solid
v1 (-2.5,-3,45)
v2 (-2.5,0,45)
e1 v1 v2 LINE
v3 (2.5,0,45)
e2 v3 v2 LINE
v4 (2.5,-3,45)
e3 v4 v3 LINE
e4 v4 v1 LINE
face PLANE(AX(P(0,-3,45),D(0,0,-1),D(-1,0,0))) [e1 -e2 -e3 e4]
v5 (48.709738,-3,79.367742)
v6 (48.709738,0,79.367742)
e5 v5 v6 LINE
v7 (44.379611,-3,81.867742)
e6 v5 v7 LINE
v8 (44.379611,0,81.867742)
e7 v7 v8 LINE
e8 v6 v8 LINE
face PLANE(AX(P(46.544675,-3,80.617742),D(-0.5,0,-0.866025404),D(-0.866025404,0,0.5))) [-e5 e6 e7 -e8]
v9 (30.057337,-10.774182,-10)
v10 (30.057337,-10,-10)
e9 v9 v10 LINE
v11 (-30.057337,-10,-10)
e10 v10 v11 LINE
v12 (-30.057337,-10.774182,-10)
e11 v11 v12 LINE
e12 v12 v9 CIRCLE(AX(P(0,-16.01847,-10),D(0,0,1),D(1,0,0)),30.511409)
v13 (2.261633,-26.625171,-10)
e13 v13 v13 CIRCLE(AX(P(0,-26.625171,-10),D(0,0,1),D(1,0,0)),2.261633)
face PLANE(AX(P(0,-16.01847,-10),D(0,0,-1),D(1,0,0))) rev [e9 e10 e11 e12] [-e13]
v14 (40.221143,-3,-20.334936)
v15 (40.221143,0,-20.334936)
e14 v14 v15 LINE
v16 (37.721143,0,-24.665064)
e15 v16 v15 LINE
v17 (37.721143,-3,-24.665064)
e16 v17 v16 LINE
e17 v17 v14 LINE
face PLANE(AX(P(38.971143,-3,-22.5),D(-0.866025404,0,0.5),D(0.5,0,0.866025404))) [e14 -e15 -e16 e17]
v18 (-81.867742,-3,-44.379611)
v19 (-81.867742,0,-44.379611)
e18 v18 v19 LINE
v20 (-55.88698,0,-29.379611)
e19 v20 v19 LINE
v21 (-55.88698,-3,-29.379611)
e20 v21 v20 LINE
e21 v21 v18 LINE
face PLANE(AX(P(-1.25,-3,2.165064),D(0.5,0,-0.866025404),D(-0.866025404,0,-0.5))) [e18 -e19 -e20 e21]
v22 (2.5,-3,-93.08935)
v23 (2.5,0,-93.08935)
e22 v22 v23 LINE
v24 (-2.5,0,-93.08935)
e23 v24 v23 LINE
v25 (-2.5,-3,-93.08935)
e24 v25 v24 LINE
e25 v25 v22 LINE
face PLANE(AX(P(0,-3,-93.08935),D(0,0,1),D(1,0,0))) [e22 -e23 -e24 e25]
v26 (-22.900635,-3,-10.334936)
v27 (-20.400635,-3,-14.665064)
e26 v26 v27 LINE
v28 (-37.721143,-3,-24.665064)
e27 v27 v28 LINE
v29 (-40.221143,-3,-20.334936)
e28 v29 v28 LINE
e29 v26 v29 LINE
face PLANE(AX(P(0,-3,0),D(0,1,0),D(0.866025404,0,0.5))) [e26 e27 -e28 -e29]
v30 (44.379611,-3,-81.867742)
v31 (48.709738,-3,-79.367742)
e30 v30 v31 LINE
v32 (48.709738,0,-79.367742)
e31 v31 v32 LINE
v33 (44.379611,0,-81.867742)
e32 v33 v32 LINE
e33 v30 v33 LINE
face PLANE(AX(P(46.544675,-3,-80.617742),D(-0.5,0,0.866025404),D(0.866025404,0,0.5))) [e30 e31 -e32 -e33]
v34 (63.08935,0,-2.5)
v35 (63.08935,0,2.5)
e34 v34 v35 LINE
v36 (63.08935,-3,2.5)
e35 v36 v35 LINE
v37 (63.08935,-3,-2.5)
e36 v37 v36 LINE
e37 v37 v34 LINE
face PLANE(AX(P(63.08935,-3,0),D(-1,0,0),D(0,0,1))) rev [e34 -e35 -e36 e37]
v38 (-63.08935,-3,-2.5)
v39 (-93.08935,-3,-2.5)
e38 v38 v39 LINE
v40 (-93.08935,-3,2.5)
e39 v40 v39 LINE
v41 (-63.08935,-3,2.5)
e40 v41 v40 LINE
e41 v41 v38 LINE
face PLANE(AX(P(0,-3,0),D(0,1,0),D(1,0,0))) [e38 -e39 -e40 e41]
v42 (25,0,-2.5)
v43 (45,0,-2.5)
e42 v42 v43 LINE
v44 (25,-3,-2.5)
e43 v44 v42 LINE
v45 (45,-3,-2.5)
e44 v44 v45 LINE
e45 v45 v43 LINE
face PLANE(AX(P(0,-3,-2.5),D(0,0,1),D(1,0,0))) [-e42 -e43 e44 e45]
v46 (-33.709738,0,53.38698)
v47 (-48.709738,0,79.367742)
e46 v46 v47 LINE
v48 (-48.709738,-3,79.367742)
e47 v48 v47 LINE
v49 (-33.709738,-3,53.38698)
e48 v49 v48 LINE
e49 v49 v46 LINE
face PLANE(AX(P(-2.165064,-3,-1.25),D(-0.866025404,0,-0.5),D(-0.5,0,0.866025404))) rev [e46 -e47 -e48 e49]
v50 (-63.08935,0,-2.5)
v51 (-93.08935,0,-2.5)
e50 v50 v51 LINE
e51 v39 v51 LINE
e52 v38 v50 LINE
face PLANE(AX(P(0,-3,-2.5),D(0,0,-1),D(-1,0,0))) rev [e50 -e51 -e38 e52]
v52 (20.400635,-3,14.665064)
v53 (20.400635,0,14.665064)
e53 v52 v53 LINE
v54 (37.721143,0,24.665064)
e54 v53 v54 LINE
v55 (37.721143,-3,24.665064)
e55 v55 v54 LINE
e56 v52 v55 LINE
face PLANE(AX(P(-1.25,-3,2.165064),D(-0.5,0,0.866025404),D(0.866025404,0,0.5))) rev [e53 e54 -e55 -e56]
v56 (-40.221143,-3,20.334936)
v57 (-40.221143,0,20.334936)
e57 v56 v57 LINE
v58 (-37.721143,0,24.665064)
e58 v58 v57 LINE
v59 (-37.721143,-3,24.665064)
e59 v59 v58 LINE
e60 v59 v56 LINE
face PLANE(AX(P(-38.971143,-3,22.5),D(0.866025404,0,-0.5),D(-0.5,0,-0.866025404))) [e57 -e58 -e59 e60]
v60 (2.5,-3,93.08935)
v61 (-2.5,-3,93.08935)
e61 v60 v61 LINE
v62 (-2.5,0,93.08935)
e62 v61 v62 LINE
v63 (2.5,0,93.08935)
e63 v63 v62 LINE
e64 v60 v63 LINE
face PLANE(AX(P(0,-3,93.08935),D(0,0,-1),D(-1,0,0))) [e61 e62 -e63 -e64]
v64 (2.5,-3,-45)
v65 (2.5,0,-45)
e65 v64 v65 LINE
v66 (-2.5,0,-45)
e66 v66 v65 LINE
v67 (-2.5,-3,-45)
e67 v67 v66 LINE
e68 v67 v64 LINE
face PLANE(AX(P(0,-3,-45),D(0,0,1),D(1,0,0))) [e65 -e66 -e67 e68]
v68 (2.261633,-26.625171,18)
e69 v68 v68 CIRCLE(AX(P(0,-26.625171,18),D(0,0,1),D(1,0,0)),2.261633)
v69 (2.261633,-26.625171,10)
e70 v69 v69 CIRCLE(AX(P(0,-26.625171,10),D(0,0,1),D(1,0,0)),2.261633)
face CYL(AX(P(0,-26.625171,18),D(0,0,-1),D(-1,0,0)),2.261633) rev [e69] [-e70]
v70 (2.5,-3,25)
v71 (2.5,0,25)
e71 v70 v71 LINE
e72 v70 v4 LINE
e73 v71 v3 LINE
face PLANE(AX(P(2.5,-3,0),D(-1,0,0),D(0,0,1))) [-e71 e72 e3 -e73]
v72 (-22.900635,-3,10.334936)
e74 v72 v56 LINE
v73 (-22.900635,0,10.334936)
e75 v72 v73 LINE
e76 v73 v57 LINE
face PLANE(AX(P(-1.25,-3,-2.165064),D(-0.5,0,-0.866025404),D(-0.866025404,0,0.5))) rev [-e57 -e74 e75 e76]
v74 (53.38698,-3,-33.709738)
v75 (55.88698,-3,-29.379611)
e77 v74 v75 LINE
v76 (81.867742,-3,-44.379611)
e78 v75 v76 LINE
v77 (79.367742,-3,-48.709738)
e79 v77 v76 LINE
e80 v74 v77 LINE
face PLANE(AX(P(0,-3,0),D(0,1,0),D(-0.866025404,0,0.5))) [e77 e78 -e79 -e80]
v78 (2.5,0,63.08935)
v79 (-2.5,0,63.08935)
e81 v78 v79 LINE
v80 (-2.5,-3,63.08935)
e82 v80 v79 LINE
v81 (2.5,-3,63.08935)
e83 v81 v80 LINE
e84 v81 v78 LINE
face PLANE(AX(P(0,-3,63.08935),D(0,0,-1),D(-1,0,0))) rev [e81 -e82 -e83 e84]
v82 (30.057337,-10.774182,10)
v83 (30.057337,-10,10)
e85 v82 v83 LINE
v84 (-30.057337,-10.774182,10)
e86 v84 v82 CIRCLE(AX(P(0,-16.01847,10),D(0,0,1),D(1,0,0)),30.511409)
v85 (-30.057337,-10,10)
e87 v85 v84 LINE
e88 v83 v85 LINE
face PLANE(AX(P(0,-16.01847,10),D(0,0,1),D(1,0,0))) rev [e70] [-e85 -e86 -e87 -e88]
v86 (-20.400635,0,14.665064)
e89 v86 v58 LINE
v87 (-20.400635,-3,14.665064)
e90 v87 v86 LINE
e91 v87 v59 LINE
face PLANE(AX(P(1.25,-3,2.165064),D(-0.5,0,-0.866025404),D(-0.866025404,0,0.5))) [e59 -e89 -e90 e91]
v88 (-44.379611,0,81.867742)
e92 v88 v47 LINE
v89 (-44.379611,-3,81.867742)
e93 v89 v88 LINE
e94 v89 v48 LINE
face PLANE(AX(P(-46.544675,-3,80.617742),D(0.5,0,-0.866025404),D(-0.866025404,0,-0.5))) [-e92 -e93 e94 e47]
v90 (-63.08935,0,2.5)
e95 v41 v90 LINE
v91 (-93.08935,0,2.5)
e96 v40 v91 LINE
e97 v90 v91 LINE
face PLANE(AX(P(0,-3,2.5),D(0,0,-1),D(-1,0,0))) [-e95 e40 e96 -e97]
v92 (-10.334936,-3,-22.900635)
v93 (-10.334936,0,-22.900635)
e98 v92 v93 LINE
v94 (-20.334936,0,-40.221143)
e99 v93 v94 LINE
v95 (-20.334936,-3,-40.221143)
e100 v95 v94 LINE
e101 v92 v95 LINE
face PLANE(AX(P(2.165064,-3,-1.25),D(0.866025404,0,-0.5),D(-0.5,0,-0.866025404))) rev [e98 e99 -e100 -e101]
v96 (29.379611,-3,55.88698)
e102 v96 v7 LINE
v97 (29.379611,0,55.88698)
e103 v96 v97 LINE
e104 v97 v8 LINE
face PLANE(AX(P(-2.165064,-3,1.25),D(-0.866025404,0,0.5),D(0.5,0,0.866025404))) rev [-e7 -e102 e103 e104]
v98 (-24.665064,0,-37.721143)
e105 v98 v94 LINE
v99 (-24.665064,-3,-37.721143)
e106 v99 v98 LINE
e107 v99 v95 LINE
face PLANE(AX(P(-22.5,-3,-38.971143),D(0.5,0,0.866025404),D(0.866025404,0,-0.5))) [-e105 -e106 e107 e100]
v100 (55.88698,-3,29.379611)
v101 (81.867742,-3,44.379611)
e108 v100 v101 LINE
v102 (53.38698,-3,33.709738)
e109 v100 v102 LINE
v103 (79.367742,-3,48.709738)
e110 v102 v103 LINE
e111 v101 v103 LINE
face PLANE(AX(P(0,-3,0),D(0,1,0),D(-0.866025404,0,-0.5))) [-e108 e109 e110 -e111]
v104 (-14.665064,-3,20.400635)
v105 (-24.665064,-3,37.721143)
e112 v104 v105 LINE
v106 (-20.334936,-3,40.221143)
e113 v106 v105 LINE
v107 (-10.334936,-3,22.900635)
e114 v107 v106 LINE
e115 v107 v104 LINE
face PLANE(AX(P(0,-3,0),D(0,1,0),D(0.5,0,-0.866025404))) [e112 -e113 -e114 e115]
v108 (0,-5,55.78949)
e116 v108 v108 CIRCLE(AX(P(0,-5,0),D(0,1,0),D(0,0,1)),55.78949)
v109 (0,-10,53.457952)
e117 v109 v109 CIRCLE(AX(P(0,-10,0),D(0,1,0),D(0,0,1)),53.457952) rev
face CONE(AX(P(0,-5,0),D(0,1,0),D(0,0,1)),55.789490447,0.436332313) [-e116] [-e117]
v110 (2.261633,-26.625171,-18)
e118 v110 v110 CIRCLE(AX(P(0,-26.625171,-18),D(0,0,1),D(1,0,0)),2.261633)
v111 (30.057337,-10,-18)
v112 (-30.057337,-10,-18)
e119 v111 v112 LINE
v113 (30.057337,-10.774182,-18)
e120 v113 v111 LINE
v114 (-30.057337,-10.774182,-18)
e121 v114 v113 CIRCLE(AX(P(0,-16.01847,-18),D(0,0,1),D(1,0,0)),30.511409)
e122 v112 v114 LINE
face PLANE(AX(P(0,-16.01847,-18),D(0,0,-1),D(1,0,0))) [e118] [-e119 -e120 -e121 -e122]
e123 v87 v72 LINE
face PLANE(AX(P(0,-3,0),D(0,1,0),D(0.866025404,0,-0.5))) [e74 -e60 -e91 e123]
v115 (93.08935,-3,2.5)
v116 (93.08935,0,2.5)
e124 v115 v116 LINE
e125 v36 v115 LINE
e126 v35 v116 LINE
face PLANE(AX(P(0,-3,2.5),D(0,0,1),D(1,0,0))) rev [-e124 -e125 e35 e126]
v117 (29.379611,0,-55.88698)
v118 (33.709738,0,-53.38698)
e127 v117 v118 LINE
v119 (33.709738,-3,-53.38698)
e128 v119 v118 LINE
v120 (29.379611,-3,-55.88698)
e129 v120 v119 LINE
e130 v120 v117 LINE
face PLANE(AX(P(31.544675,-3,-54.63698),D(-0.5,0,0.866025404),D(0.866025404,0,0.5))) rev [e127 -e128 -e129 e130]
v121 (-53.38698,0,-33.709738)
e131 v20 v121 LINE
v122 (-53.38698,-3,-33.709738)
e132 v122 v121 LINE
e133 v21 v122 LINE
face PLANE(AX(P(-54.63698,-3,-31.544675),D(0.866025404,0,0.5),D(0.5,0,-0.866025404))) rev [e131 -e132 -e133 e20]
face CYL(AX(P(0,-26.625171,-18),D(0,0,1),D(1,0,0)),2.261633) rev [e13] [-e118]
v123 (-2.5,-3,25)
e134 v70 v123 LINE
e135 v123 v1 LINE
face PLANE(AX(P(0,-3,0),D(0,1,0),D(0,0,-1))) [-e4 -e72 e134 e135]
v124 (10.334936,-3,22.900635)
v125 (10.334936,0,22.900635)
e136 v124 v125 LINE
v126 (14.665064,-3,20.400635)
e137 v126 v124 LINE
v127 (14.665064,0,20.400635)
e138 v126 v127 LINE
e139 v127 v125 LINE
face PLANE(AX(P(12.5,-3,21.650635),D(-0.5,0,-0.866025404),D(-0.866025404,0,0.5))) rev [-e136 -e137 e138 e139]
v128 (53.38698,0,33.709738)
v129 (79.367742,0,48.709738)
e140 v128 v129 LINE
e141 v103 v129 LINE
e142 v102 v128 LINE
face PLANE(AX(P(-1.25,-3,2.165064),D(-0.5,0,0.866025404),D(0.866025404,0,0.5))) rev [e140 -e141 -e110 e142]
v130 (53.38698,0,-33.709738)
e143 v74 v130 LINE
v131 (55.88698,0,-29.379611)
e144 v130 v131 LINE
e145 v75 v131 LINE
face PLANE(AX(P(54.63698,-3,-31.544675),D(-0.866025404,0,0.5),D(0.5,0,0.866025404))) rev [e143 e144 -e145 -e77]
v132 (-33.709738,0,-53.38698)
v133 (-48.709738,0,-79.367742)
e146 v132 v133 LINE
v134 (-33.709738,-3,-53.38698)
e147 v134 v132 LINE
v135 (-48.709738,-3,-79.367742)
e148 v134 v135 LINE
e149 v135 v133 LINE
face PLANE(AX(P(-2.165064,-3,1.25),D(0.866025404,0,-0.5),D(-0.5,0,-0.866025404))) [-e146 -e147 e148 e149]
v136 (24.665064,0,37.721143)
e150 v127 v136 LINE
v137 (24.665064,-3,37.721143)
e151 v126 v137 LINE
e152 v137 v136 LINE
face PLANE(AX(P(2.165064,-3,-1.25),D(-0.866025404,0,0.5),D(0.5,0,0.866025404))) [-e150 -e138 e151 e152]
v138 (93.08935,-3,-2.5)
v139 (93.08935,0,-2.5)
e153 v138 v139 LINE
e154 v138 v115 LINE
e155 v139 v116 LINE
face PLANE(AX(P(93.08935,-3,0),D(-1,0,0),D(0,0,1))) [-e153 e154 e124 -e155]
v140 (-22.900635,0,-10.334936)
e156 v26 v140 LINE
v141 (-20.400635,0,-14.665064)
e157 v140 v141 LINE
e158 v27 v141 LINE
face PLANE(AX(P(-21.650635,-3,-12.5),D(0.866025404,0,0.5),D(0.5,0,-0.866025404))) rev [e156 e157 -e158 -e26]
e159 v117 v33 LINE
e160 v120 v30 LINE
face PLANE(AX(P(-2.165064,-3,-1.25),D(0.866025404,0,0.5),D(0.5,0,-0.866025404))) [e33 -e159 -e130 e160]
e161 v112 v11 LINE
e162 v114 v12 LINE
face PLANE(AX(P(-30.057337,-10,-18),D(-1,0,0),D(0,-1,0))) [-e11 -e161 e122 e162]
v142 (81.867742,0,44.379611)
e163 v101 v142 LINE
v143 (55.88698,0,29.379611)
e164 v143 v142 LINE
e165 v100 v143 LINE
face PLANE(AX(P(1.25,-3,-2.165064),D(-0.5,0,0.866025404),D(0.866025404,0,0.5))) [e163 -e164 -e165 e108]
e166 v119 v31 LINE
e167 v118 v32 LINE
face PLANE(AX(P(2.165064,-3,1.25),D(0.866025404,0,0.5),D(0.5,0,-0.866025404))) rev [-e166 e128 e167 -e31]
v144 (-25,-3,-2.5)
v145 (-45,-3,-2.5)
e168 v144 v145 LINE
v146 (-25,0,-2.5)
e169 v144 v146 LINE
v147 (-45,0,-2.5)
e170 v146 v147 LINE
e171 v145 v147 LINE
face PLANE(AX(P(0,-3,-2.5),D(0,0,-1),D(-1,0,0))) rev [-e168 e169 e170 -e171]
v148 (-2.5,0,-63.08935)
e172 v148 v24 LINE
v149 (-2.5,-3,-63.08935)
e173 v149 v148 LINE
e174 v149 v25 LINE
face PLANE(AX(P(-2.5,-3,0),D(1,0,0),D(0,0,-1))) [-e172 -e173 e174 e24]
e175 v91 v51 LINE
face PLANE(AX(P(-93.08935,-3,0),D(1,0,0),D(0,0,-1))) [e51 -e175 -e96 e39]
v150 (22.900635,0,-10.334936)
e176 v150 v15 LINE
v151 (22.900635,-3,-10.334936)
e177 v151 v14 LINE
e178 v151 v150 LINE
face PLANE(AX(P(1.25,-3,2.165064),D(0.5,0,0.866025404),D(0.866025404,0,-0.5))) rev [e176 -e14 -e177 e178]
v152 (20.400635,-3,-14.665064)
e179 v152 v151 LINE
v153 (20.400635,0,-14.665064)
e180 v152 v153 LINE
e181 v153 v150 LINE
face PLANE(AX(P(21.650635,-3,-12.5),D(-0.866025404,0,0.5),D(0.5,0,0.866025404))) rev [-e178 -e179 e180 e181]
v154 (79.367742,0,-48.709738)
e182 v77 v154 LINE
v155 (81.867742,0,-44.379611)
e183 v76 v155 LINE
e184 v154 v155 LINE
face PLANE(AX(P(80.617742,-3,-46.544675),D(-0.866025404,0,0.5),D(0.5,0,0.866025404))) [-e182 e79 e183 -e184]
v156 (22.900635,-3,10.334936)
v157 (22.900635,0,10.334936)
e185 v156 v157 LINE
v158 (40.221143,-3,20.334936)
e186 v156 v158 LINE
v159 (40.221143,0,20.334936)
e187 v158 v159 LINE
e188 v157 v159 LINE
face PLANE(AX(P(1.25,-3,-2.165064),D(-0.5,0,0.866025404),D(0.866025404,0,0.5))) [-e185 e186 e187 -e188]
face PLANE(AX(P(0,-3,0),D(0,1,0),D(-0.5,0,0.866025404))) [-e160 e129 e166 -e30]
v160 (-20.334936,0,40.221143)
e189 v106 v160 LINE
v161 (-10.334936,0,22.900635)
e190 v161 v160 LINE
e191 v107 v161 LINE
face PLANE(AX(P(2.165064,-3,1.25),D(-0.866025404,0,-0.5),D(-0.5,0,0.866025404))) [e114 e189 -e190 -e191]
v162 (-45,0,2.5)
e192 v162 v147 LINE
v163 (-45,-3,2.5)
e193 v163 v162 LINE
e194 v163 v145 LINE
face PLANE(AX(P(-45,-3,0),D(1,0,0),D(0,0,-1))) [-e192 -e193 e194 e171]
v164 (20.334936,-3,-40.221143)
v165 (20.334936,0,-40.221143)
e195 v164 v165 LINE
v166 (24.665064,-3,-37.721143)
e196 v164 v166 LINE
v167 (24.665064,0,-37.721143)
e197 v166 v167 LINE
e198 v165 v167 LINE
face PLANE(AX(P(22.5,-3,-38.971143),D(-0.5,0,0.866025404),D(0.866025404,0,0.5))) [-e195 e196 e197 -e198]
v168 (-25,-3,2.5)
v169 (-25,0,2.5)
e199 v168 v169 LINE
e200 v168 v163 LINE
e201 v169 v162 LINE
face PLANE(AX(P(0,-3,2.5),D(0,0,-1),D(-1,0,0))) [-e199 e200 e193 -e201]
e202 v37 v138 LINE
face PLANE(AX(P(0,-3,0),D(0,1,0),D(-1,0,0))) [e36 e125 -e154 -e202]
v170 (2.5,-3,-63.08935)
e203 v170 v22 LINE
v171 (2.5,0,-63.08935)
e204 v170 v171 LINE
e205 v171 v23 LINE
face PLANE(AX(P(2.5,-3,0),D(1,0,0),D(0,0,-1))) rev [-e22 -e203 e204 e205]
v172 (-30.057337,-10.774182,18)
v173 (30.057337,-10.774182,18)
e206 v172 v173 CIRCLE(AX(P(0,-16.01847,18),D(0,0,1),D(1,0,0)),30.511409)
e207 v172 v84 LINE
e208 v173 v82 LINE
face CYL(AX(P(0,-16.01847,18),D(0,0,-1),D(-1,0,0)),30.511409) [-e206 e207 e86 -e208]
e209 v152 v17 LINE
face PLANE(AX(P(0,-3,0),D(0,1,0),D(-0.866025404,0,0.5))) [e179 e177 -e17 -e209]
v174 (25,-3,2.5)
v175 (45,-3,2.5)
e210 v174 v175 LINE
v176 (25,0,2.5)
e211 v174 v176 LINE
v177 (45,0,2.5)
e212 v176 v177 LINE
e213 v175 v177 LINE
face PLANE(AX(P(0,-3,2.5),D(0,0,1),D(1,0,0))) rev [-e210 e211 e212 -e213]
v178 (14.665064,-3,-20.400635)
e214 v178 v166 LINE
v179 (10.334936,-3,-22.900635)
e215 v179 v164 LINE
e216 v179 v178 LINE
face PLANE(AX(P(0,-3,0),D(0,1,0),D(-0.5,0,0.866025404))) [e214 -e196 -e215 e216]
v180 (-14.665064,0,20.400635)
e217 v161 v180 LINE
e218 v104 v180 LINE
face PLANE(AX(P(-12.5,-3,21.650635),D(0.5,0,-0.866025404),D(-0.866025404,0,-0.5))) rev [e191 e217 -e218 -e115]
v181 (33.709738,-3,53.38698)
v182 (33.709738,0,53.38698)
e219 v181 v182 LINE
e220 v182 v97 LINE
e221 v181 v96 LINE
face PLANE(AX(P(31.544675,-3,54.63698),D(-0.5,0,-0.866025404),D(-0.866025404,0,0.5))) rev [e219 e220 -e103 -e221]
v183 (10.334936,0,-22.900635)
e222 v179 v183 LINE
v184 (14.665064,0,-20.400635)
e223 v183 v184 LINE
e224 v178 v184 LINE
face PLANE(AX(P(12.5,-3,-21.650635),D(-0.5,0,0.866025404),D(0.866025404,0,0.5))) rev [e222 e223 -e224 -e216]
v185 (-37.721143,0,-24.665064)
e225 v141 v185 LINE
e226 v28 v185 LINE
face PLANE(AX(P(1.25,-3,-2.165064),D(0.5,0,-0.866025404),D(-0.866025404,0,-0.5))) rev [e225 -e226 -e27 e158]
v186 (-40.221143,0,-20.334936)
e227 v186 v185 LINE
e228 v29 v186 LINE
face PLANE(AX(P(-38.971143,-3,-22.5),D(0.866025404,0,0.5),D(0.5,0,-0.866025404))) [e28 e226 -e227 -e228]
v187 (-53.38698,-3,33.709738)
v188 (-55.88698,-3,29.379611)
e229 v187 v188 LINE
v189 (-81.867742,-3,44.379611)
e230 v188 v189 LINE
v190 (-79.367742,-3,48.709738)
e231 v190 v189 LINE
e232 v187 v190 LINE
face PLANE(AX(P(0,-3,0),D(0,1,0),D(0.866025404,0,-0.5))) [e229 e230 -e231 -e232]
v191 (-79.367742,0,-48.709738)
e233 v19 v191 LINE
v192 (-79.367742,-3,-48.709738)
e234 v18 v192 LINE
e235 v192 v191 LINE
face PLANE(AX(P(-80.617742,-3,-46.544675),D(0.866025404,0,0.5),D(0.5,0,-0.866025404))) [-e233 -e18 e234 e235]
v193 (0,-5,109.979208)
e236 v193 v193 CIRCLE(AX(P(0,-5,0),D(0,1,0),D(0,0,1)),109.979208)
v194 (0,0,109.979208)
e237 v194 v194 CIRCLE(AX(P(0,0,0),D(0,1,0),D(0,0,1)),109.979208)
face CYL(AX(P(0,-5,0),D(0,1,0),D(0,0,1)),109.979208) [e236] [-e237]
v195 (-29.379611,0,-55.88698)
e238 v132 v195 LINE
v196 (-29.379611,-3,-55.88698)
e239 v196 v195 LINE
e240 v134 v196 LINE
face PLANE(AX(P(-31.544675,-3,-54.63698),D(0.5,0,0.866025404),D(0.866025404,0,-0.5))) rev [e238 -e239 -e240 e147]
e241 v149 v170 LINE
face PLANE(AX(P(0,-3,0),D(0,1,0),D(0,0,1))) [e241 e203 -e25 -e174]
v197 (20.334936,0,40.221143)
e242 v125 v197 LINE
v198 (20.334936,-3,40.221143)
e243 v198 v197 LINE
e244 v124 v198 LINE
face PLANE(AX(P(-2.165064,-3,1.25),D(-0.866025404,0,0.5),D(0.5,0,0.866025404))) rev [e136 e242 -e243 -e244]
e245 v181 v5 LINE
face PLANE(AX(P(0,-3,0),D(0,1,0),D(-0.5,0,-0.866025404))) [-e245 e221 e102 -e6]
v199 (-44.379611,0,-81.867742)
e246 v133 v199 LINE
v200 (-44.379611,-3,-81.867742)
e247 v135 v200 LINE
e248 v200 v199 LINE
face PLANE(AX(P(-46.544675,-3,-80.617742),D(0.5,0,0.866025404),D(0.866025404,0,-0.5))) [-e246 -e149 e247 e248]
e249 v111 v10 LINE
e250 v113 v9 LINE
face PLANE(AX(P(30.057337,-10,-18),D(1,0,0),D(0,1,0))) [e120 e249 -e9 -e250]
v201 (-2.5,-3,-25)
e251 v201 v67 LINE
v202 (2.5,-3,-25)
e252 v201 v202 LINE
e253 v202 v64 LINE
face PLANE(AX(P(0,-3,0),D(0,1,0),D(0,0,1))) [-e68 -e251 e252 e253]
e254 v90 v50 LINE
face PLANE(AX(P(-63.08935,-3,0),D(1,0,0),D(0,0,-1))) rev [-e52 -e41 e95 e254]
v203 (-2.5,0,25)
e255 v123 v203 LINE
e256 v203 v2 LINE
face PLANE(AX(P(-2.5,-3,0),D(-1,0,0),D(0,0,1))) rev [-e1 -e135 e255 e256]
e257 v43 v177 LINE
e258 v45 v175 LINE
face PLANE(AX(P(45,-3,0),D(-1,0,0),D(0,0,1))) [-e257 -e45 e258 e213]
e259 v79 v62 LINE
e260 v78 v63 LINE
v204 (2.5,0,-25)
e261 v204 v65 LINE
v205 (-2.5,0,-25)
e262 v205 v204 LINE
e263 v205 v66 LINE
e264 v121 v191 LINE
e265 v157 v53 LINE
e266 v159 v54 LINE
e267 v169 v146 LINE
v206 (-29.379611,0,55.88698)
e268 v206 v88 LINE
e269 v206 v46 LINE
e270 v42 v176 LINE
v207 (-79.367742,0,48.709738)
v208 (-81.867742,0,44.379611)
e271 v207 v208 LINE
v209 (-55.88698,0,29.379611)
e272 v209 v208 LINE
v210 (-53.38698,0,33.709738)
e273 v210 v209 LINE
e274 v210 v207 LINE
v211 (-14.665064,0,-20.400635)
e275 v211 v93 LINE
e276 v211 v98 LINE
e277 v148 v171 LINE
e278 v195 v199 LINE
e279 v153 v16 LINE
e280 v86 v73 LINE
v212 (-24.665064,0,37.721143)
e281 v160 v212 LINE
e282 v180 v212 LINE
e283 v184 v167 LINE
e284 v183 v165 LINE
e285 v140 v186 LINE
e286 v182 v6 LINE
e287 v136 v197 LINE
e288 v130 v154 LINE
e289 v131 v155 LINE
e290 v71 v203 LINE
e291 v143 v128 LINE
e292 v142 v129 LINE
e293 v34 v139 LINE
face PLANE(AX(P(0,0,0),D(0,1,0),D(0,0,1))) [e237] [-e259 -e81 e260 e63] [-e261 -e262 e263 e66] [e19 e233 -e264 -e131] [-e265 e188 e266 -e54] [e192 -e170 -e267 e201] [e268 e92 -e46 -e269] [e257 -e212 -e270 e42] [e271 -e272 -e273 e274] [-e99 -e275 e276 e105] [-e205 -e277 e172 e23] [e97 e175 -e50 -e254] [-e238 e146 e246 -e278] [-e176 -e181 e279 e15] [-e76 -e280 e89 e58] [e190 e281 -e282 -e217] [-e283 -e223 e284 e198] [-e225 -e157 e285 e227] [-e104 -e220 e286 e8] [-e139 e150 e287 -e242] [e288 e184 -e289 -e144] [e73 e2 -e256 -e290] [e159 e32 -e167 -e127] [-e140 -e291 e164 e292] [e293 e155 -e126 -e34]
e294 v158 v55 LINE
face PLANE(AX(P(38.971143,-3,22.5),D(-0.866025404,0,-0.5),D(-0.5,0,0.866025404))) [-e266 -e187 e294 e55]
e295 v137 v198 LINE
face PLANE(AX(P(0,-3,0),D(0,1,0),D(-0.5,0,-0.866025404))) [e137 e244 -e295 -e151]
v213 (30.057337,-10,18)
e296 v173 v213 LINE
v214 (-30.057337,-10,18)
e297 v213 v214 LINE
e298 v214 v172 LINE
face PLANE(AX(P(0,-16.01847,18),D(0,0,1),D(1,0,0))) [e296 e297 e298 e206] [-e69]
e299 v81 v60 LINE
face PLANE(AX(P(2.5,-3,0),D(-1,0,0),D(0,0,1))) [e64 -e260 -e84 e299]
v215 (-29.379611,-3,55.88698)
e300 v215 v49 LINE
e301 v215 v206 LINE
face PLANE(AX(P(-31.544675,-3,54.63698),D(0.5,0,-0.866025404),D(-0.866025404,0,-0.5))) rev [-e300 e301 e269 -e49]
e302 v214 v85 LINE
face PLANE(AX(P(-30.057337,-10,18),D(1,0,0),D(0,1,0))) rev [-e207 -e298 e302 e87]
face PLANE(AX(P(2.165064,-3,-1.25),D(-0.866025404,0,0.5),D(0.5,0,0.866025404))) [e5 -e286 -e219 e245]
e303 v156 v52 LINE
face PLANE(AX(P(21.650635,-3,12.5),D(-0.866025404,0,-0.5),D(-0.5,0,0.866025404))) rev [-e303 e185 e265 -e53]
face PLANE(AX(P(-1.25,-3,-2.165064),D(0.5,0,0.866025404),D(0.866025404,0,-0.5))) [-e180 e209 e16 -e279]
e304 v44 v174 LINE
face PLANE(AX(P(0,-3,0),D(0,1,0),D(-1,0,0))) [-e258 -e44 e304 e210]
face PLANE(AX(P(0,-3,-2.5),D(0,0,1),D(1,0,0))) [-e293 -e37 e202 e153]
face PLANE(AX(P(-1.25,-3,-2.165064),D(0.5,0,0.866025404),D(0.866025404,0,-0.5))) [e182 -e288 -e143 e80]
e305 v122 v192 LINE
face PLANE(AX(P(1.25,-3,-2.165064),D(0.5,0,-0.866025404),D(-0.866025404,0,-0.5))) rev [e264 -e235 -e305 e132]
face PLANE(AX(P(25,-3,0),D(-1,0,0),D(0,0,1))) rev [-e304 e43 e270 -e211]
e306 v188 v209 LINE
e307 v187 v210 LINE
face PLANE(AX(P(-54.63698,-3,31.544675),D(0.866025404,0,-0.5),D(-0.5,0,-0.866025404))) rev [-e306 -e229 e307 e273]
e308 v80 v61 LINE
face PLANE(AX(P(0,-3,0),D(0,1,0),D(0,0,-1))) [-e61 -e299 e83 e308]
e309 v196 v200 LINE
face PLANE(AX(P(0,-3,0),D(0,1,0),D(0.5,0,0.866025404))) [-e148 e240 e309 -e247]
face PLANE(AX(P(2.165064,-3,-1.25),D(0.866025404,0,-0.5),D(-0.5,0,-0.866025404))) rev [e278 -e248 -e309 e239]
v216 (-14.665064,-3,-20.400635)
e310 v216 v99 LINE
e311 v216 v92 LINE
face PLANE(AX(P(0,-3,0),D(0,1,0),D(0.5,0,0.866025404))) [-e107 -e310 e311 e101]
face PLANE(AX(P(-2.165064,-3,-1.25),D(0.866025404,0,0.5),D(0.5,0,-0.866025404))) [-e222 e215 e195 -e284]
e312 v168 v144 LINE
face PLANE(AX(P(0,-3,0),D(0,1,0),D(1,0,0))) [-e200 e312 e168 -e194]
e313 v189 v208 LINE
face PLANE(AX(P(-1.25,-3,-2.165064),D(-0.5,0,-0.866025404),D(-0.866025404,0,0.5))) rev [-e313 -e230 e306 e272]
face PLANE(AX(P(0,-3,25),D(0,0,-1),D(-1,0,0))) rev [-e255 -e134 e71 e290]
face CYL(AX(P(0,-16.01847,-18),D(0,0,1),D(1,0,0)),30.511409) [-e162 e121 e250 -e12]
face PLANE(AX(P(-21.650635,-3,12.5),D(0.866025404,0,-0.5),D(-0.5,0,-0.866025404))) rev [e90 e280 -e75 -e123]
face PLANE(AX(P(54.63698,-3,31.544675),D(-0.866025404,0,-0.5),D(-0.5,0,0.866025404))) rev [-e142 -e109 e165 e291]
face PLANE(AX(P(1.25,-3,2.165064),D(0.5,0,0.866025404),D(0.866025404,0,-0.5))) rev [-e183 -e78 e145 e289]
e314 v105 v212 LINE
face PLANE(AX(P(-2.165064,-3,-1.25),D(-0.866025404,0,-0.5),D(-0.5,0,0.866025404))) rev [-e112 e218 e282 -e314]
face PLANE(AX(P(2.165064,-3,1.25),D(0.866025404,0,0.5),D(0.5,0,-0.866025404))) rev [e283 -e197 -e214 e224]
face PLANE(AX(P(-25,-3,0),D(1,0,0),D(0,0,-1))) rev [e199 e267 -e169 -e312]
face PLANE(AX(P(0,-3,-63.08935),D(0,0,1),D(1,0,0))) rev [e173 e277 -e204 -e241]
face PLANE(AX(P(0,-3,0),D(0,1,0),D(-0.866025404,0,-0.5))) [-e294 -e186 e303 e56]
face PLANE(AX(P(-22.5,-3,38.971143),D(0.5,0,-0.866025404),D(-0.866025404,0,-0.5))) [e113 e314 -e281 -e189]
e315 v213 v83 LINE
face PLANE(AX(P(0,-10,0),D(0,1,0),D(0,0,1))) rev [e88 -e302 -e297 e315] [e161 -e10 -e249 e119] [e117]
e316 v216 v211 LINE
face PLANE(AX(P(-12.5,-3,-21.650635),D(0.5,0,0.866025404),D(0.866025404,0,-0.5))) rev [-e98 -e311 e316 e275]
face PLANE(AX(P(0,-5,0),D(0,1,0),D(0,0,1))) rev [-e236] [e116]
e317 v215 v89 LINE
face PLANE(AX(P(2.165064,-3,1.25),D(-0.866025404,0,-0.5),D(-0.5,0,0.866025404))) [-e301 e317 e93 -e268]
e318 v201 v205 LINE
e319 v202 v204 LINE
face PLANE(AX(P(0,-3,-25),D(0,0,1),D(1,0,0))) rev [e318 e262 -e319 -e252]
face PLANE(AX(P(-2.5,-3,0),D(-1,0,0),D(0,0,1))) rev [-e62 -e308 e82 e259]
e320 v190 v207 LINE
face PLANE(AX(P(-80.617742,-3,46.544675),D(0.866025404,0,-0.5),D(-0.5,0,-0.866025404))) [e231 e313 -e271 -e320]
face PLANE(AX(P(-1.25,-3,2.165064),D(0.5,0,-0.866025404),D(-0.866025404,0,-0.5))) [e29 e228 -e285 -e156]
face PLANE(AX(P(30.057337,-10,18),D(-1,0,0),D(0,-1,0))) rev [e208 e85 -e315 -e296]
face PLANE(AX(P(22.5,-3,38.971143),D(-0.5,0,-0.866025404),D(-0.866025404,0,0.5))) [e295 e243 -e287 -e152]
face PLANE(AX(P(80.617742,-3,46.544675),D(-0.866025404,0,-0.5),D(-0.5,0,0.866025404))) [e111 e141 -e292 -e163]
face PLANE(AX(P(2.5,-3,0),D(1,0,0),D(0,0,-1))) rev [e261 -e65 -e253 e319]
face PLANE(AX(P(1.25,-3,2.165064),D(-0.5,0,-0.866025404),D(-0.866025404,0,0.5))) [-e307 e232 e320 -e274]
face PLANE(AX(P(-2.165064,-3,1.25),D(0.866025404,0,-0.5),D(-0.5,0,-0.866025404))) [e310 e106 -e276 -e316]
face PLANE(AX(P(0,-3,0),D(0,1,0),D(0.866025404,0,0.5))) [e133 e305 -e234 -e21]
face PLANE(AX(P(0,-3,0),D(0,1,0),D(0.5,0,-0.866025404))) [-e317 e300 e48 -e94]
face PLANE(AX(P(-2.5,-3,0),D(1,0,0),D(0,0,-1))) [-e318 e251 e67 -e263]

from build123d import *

# Parameters (mm, degrees)
SKETCH1_R           = 109.979208013
SKETCH1_R_2         = 55.789490447
BOSS_EXTRUDE1_DEPTH = 5
SKETCH1_3_R         = 55.789490447
BOSS_EXTRUDE2_DEPTH = 10
SKETCH1_4_W         = 5
SKETCH1_4_H         = 20
SKETCH1_4_H_2       = 30
CUT_EXTRUDE1_DEPTH  = 3
CIRPATTERN1_COUNT   = 12
SKETCH4_R           = 2.261632511
BOSS_EXTRUDE3_DEPTH = 8
CHAMFER1_SIZE2      = 2.331538291
CHAMFER1_SIZE       = 5


with BuildPart() as part:
    # Sketch1 → Boss-Extrude1 (new body)
    with BuildSketch(Plane(origin=(0, 0, 0), x_dir=(1, 0, 0), z_dir=(0, 1, 0))):
        with Locations(Location((0, 0, 0), (0, 0, 270))):
            Circle(SKETCH1_R)
        with Locations(Location((0, 0, 0), (0, 0, 270))):
            Circle(SKETCH1_R_2, mode=Mode.SUBTRACT)
    extrude(amount=-BOSS_EXTRUDE1_DEPTH)

    # Sketch1<3> → Boss-Extrude2 (add)
    with BuildSketch(Plane(origin=(0, 0, 0), x_dir=(1, 0, 0), z_dir=(0, 1, 0))):
        with Locations(Location((0, 0, 0), (0, 0, 270))):
            Circle(SKETCH1_3_R)
    extrude(amount=-BOSS_EXTRUDE2_DEPTH)

    # Sketch1<4> → Cut-Extrude1 (cut)
    with BuildSketch(Plane(origin=(0, 0, 0), x_dir=(1, 0, 0), z_dir=(0, 1, 0))):
        with Locations((0, 35)):
            Rectangle(SKETCH1_4_W, SKETCH1_4_H)
        with Locations((0, 78.089349727)):
            Rectangle(SKETCH1_4_W, SKETCH1_4_H_2)
    cut_extrude1 = extrude(amount=-CUT_EXTRUDE1_DEPTH, mode=Mode.SUBTRACT)

    # CirPattern1: Cut-Extrude1 ×12 about axis
    cirpattern1_axis = Axis((0, 0, 0), (0, 1, 0))
    for i in range(1, CIRPATTERN1_COUNT):
        add(cut_extrude1.rotate(cirpattern1_axis, i * 360 / CIRPATTERN1_COUNT), mode=Mode.SUBTRACT)

    # Sketch4 → Boss-Extrude3 (add)
    with BuildSketch(Plane.XY.offset(10)):
        with BuildLine():
            Line((-30.05733698, -10), (30.05733698, -10))
            Line((30.05733698, -10), (30.05733698, -10.774181914))
            ThreePointArc((30.05733698, -10.774181914), (0, -46.529878203), (-30.05733698, -10.774181914))
            Line((-30.05733698, -10.774181914), (-30.05733698, -10))
        make_face()
        with Locations((0, -26.625171413)):
            Circle(SKETCH4_R, mode=Mode.SUBTRACT)
    boss_extrude3 = extrude(amount=BOSS_EXTRUDE3_DEPTH)

    # Mirror1: Boss-Extrude3 across plane
    add(boss_extrude3.mirror(Plane.XY))

    # Chamfer1
    chamfer1_edges = [part.edges().sort_by_distance(p)[0] for p in [
        (0, -10, -55.789490447),
    ]]
    chamfer1_side = [part.faces().sort_by_distance(p)[0] for p in [
        (0, -9.953369234, -55.789490447),
    ]]
    chamfer(chamfer1_edges, length=CHAMFER1_SIZE - 0.0001, length2=CHAMFER1_SIZE2 - 0.0001, reference=chamfer1_side[0])  # a hair under: the kernel refuses the full size


solid = part.part
